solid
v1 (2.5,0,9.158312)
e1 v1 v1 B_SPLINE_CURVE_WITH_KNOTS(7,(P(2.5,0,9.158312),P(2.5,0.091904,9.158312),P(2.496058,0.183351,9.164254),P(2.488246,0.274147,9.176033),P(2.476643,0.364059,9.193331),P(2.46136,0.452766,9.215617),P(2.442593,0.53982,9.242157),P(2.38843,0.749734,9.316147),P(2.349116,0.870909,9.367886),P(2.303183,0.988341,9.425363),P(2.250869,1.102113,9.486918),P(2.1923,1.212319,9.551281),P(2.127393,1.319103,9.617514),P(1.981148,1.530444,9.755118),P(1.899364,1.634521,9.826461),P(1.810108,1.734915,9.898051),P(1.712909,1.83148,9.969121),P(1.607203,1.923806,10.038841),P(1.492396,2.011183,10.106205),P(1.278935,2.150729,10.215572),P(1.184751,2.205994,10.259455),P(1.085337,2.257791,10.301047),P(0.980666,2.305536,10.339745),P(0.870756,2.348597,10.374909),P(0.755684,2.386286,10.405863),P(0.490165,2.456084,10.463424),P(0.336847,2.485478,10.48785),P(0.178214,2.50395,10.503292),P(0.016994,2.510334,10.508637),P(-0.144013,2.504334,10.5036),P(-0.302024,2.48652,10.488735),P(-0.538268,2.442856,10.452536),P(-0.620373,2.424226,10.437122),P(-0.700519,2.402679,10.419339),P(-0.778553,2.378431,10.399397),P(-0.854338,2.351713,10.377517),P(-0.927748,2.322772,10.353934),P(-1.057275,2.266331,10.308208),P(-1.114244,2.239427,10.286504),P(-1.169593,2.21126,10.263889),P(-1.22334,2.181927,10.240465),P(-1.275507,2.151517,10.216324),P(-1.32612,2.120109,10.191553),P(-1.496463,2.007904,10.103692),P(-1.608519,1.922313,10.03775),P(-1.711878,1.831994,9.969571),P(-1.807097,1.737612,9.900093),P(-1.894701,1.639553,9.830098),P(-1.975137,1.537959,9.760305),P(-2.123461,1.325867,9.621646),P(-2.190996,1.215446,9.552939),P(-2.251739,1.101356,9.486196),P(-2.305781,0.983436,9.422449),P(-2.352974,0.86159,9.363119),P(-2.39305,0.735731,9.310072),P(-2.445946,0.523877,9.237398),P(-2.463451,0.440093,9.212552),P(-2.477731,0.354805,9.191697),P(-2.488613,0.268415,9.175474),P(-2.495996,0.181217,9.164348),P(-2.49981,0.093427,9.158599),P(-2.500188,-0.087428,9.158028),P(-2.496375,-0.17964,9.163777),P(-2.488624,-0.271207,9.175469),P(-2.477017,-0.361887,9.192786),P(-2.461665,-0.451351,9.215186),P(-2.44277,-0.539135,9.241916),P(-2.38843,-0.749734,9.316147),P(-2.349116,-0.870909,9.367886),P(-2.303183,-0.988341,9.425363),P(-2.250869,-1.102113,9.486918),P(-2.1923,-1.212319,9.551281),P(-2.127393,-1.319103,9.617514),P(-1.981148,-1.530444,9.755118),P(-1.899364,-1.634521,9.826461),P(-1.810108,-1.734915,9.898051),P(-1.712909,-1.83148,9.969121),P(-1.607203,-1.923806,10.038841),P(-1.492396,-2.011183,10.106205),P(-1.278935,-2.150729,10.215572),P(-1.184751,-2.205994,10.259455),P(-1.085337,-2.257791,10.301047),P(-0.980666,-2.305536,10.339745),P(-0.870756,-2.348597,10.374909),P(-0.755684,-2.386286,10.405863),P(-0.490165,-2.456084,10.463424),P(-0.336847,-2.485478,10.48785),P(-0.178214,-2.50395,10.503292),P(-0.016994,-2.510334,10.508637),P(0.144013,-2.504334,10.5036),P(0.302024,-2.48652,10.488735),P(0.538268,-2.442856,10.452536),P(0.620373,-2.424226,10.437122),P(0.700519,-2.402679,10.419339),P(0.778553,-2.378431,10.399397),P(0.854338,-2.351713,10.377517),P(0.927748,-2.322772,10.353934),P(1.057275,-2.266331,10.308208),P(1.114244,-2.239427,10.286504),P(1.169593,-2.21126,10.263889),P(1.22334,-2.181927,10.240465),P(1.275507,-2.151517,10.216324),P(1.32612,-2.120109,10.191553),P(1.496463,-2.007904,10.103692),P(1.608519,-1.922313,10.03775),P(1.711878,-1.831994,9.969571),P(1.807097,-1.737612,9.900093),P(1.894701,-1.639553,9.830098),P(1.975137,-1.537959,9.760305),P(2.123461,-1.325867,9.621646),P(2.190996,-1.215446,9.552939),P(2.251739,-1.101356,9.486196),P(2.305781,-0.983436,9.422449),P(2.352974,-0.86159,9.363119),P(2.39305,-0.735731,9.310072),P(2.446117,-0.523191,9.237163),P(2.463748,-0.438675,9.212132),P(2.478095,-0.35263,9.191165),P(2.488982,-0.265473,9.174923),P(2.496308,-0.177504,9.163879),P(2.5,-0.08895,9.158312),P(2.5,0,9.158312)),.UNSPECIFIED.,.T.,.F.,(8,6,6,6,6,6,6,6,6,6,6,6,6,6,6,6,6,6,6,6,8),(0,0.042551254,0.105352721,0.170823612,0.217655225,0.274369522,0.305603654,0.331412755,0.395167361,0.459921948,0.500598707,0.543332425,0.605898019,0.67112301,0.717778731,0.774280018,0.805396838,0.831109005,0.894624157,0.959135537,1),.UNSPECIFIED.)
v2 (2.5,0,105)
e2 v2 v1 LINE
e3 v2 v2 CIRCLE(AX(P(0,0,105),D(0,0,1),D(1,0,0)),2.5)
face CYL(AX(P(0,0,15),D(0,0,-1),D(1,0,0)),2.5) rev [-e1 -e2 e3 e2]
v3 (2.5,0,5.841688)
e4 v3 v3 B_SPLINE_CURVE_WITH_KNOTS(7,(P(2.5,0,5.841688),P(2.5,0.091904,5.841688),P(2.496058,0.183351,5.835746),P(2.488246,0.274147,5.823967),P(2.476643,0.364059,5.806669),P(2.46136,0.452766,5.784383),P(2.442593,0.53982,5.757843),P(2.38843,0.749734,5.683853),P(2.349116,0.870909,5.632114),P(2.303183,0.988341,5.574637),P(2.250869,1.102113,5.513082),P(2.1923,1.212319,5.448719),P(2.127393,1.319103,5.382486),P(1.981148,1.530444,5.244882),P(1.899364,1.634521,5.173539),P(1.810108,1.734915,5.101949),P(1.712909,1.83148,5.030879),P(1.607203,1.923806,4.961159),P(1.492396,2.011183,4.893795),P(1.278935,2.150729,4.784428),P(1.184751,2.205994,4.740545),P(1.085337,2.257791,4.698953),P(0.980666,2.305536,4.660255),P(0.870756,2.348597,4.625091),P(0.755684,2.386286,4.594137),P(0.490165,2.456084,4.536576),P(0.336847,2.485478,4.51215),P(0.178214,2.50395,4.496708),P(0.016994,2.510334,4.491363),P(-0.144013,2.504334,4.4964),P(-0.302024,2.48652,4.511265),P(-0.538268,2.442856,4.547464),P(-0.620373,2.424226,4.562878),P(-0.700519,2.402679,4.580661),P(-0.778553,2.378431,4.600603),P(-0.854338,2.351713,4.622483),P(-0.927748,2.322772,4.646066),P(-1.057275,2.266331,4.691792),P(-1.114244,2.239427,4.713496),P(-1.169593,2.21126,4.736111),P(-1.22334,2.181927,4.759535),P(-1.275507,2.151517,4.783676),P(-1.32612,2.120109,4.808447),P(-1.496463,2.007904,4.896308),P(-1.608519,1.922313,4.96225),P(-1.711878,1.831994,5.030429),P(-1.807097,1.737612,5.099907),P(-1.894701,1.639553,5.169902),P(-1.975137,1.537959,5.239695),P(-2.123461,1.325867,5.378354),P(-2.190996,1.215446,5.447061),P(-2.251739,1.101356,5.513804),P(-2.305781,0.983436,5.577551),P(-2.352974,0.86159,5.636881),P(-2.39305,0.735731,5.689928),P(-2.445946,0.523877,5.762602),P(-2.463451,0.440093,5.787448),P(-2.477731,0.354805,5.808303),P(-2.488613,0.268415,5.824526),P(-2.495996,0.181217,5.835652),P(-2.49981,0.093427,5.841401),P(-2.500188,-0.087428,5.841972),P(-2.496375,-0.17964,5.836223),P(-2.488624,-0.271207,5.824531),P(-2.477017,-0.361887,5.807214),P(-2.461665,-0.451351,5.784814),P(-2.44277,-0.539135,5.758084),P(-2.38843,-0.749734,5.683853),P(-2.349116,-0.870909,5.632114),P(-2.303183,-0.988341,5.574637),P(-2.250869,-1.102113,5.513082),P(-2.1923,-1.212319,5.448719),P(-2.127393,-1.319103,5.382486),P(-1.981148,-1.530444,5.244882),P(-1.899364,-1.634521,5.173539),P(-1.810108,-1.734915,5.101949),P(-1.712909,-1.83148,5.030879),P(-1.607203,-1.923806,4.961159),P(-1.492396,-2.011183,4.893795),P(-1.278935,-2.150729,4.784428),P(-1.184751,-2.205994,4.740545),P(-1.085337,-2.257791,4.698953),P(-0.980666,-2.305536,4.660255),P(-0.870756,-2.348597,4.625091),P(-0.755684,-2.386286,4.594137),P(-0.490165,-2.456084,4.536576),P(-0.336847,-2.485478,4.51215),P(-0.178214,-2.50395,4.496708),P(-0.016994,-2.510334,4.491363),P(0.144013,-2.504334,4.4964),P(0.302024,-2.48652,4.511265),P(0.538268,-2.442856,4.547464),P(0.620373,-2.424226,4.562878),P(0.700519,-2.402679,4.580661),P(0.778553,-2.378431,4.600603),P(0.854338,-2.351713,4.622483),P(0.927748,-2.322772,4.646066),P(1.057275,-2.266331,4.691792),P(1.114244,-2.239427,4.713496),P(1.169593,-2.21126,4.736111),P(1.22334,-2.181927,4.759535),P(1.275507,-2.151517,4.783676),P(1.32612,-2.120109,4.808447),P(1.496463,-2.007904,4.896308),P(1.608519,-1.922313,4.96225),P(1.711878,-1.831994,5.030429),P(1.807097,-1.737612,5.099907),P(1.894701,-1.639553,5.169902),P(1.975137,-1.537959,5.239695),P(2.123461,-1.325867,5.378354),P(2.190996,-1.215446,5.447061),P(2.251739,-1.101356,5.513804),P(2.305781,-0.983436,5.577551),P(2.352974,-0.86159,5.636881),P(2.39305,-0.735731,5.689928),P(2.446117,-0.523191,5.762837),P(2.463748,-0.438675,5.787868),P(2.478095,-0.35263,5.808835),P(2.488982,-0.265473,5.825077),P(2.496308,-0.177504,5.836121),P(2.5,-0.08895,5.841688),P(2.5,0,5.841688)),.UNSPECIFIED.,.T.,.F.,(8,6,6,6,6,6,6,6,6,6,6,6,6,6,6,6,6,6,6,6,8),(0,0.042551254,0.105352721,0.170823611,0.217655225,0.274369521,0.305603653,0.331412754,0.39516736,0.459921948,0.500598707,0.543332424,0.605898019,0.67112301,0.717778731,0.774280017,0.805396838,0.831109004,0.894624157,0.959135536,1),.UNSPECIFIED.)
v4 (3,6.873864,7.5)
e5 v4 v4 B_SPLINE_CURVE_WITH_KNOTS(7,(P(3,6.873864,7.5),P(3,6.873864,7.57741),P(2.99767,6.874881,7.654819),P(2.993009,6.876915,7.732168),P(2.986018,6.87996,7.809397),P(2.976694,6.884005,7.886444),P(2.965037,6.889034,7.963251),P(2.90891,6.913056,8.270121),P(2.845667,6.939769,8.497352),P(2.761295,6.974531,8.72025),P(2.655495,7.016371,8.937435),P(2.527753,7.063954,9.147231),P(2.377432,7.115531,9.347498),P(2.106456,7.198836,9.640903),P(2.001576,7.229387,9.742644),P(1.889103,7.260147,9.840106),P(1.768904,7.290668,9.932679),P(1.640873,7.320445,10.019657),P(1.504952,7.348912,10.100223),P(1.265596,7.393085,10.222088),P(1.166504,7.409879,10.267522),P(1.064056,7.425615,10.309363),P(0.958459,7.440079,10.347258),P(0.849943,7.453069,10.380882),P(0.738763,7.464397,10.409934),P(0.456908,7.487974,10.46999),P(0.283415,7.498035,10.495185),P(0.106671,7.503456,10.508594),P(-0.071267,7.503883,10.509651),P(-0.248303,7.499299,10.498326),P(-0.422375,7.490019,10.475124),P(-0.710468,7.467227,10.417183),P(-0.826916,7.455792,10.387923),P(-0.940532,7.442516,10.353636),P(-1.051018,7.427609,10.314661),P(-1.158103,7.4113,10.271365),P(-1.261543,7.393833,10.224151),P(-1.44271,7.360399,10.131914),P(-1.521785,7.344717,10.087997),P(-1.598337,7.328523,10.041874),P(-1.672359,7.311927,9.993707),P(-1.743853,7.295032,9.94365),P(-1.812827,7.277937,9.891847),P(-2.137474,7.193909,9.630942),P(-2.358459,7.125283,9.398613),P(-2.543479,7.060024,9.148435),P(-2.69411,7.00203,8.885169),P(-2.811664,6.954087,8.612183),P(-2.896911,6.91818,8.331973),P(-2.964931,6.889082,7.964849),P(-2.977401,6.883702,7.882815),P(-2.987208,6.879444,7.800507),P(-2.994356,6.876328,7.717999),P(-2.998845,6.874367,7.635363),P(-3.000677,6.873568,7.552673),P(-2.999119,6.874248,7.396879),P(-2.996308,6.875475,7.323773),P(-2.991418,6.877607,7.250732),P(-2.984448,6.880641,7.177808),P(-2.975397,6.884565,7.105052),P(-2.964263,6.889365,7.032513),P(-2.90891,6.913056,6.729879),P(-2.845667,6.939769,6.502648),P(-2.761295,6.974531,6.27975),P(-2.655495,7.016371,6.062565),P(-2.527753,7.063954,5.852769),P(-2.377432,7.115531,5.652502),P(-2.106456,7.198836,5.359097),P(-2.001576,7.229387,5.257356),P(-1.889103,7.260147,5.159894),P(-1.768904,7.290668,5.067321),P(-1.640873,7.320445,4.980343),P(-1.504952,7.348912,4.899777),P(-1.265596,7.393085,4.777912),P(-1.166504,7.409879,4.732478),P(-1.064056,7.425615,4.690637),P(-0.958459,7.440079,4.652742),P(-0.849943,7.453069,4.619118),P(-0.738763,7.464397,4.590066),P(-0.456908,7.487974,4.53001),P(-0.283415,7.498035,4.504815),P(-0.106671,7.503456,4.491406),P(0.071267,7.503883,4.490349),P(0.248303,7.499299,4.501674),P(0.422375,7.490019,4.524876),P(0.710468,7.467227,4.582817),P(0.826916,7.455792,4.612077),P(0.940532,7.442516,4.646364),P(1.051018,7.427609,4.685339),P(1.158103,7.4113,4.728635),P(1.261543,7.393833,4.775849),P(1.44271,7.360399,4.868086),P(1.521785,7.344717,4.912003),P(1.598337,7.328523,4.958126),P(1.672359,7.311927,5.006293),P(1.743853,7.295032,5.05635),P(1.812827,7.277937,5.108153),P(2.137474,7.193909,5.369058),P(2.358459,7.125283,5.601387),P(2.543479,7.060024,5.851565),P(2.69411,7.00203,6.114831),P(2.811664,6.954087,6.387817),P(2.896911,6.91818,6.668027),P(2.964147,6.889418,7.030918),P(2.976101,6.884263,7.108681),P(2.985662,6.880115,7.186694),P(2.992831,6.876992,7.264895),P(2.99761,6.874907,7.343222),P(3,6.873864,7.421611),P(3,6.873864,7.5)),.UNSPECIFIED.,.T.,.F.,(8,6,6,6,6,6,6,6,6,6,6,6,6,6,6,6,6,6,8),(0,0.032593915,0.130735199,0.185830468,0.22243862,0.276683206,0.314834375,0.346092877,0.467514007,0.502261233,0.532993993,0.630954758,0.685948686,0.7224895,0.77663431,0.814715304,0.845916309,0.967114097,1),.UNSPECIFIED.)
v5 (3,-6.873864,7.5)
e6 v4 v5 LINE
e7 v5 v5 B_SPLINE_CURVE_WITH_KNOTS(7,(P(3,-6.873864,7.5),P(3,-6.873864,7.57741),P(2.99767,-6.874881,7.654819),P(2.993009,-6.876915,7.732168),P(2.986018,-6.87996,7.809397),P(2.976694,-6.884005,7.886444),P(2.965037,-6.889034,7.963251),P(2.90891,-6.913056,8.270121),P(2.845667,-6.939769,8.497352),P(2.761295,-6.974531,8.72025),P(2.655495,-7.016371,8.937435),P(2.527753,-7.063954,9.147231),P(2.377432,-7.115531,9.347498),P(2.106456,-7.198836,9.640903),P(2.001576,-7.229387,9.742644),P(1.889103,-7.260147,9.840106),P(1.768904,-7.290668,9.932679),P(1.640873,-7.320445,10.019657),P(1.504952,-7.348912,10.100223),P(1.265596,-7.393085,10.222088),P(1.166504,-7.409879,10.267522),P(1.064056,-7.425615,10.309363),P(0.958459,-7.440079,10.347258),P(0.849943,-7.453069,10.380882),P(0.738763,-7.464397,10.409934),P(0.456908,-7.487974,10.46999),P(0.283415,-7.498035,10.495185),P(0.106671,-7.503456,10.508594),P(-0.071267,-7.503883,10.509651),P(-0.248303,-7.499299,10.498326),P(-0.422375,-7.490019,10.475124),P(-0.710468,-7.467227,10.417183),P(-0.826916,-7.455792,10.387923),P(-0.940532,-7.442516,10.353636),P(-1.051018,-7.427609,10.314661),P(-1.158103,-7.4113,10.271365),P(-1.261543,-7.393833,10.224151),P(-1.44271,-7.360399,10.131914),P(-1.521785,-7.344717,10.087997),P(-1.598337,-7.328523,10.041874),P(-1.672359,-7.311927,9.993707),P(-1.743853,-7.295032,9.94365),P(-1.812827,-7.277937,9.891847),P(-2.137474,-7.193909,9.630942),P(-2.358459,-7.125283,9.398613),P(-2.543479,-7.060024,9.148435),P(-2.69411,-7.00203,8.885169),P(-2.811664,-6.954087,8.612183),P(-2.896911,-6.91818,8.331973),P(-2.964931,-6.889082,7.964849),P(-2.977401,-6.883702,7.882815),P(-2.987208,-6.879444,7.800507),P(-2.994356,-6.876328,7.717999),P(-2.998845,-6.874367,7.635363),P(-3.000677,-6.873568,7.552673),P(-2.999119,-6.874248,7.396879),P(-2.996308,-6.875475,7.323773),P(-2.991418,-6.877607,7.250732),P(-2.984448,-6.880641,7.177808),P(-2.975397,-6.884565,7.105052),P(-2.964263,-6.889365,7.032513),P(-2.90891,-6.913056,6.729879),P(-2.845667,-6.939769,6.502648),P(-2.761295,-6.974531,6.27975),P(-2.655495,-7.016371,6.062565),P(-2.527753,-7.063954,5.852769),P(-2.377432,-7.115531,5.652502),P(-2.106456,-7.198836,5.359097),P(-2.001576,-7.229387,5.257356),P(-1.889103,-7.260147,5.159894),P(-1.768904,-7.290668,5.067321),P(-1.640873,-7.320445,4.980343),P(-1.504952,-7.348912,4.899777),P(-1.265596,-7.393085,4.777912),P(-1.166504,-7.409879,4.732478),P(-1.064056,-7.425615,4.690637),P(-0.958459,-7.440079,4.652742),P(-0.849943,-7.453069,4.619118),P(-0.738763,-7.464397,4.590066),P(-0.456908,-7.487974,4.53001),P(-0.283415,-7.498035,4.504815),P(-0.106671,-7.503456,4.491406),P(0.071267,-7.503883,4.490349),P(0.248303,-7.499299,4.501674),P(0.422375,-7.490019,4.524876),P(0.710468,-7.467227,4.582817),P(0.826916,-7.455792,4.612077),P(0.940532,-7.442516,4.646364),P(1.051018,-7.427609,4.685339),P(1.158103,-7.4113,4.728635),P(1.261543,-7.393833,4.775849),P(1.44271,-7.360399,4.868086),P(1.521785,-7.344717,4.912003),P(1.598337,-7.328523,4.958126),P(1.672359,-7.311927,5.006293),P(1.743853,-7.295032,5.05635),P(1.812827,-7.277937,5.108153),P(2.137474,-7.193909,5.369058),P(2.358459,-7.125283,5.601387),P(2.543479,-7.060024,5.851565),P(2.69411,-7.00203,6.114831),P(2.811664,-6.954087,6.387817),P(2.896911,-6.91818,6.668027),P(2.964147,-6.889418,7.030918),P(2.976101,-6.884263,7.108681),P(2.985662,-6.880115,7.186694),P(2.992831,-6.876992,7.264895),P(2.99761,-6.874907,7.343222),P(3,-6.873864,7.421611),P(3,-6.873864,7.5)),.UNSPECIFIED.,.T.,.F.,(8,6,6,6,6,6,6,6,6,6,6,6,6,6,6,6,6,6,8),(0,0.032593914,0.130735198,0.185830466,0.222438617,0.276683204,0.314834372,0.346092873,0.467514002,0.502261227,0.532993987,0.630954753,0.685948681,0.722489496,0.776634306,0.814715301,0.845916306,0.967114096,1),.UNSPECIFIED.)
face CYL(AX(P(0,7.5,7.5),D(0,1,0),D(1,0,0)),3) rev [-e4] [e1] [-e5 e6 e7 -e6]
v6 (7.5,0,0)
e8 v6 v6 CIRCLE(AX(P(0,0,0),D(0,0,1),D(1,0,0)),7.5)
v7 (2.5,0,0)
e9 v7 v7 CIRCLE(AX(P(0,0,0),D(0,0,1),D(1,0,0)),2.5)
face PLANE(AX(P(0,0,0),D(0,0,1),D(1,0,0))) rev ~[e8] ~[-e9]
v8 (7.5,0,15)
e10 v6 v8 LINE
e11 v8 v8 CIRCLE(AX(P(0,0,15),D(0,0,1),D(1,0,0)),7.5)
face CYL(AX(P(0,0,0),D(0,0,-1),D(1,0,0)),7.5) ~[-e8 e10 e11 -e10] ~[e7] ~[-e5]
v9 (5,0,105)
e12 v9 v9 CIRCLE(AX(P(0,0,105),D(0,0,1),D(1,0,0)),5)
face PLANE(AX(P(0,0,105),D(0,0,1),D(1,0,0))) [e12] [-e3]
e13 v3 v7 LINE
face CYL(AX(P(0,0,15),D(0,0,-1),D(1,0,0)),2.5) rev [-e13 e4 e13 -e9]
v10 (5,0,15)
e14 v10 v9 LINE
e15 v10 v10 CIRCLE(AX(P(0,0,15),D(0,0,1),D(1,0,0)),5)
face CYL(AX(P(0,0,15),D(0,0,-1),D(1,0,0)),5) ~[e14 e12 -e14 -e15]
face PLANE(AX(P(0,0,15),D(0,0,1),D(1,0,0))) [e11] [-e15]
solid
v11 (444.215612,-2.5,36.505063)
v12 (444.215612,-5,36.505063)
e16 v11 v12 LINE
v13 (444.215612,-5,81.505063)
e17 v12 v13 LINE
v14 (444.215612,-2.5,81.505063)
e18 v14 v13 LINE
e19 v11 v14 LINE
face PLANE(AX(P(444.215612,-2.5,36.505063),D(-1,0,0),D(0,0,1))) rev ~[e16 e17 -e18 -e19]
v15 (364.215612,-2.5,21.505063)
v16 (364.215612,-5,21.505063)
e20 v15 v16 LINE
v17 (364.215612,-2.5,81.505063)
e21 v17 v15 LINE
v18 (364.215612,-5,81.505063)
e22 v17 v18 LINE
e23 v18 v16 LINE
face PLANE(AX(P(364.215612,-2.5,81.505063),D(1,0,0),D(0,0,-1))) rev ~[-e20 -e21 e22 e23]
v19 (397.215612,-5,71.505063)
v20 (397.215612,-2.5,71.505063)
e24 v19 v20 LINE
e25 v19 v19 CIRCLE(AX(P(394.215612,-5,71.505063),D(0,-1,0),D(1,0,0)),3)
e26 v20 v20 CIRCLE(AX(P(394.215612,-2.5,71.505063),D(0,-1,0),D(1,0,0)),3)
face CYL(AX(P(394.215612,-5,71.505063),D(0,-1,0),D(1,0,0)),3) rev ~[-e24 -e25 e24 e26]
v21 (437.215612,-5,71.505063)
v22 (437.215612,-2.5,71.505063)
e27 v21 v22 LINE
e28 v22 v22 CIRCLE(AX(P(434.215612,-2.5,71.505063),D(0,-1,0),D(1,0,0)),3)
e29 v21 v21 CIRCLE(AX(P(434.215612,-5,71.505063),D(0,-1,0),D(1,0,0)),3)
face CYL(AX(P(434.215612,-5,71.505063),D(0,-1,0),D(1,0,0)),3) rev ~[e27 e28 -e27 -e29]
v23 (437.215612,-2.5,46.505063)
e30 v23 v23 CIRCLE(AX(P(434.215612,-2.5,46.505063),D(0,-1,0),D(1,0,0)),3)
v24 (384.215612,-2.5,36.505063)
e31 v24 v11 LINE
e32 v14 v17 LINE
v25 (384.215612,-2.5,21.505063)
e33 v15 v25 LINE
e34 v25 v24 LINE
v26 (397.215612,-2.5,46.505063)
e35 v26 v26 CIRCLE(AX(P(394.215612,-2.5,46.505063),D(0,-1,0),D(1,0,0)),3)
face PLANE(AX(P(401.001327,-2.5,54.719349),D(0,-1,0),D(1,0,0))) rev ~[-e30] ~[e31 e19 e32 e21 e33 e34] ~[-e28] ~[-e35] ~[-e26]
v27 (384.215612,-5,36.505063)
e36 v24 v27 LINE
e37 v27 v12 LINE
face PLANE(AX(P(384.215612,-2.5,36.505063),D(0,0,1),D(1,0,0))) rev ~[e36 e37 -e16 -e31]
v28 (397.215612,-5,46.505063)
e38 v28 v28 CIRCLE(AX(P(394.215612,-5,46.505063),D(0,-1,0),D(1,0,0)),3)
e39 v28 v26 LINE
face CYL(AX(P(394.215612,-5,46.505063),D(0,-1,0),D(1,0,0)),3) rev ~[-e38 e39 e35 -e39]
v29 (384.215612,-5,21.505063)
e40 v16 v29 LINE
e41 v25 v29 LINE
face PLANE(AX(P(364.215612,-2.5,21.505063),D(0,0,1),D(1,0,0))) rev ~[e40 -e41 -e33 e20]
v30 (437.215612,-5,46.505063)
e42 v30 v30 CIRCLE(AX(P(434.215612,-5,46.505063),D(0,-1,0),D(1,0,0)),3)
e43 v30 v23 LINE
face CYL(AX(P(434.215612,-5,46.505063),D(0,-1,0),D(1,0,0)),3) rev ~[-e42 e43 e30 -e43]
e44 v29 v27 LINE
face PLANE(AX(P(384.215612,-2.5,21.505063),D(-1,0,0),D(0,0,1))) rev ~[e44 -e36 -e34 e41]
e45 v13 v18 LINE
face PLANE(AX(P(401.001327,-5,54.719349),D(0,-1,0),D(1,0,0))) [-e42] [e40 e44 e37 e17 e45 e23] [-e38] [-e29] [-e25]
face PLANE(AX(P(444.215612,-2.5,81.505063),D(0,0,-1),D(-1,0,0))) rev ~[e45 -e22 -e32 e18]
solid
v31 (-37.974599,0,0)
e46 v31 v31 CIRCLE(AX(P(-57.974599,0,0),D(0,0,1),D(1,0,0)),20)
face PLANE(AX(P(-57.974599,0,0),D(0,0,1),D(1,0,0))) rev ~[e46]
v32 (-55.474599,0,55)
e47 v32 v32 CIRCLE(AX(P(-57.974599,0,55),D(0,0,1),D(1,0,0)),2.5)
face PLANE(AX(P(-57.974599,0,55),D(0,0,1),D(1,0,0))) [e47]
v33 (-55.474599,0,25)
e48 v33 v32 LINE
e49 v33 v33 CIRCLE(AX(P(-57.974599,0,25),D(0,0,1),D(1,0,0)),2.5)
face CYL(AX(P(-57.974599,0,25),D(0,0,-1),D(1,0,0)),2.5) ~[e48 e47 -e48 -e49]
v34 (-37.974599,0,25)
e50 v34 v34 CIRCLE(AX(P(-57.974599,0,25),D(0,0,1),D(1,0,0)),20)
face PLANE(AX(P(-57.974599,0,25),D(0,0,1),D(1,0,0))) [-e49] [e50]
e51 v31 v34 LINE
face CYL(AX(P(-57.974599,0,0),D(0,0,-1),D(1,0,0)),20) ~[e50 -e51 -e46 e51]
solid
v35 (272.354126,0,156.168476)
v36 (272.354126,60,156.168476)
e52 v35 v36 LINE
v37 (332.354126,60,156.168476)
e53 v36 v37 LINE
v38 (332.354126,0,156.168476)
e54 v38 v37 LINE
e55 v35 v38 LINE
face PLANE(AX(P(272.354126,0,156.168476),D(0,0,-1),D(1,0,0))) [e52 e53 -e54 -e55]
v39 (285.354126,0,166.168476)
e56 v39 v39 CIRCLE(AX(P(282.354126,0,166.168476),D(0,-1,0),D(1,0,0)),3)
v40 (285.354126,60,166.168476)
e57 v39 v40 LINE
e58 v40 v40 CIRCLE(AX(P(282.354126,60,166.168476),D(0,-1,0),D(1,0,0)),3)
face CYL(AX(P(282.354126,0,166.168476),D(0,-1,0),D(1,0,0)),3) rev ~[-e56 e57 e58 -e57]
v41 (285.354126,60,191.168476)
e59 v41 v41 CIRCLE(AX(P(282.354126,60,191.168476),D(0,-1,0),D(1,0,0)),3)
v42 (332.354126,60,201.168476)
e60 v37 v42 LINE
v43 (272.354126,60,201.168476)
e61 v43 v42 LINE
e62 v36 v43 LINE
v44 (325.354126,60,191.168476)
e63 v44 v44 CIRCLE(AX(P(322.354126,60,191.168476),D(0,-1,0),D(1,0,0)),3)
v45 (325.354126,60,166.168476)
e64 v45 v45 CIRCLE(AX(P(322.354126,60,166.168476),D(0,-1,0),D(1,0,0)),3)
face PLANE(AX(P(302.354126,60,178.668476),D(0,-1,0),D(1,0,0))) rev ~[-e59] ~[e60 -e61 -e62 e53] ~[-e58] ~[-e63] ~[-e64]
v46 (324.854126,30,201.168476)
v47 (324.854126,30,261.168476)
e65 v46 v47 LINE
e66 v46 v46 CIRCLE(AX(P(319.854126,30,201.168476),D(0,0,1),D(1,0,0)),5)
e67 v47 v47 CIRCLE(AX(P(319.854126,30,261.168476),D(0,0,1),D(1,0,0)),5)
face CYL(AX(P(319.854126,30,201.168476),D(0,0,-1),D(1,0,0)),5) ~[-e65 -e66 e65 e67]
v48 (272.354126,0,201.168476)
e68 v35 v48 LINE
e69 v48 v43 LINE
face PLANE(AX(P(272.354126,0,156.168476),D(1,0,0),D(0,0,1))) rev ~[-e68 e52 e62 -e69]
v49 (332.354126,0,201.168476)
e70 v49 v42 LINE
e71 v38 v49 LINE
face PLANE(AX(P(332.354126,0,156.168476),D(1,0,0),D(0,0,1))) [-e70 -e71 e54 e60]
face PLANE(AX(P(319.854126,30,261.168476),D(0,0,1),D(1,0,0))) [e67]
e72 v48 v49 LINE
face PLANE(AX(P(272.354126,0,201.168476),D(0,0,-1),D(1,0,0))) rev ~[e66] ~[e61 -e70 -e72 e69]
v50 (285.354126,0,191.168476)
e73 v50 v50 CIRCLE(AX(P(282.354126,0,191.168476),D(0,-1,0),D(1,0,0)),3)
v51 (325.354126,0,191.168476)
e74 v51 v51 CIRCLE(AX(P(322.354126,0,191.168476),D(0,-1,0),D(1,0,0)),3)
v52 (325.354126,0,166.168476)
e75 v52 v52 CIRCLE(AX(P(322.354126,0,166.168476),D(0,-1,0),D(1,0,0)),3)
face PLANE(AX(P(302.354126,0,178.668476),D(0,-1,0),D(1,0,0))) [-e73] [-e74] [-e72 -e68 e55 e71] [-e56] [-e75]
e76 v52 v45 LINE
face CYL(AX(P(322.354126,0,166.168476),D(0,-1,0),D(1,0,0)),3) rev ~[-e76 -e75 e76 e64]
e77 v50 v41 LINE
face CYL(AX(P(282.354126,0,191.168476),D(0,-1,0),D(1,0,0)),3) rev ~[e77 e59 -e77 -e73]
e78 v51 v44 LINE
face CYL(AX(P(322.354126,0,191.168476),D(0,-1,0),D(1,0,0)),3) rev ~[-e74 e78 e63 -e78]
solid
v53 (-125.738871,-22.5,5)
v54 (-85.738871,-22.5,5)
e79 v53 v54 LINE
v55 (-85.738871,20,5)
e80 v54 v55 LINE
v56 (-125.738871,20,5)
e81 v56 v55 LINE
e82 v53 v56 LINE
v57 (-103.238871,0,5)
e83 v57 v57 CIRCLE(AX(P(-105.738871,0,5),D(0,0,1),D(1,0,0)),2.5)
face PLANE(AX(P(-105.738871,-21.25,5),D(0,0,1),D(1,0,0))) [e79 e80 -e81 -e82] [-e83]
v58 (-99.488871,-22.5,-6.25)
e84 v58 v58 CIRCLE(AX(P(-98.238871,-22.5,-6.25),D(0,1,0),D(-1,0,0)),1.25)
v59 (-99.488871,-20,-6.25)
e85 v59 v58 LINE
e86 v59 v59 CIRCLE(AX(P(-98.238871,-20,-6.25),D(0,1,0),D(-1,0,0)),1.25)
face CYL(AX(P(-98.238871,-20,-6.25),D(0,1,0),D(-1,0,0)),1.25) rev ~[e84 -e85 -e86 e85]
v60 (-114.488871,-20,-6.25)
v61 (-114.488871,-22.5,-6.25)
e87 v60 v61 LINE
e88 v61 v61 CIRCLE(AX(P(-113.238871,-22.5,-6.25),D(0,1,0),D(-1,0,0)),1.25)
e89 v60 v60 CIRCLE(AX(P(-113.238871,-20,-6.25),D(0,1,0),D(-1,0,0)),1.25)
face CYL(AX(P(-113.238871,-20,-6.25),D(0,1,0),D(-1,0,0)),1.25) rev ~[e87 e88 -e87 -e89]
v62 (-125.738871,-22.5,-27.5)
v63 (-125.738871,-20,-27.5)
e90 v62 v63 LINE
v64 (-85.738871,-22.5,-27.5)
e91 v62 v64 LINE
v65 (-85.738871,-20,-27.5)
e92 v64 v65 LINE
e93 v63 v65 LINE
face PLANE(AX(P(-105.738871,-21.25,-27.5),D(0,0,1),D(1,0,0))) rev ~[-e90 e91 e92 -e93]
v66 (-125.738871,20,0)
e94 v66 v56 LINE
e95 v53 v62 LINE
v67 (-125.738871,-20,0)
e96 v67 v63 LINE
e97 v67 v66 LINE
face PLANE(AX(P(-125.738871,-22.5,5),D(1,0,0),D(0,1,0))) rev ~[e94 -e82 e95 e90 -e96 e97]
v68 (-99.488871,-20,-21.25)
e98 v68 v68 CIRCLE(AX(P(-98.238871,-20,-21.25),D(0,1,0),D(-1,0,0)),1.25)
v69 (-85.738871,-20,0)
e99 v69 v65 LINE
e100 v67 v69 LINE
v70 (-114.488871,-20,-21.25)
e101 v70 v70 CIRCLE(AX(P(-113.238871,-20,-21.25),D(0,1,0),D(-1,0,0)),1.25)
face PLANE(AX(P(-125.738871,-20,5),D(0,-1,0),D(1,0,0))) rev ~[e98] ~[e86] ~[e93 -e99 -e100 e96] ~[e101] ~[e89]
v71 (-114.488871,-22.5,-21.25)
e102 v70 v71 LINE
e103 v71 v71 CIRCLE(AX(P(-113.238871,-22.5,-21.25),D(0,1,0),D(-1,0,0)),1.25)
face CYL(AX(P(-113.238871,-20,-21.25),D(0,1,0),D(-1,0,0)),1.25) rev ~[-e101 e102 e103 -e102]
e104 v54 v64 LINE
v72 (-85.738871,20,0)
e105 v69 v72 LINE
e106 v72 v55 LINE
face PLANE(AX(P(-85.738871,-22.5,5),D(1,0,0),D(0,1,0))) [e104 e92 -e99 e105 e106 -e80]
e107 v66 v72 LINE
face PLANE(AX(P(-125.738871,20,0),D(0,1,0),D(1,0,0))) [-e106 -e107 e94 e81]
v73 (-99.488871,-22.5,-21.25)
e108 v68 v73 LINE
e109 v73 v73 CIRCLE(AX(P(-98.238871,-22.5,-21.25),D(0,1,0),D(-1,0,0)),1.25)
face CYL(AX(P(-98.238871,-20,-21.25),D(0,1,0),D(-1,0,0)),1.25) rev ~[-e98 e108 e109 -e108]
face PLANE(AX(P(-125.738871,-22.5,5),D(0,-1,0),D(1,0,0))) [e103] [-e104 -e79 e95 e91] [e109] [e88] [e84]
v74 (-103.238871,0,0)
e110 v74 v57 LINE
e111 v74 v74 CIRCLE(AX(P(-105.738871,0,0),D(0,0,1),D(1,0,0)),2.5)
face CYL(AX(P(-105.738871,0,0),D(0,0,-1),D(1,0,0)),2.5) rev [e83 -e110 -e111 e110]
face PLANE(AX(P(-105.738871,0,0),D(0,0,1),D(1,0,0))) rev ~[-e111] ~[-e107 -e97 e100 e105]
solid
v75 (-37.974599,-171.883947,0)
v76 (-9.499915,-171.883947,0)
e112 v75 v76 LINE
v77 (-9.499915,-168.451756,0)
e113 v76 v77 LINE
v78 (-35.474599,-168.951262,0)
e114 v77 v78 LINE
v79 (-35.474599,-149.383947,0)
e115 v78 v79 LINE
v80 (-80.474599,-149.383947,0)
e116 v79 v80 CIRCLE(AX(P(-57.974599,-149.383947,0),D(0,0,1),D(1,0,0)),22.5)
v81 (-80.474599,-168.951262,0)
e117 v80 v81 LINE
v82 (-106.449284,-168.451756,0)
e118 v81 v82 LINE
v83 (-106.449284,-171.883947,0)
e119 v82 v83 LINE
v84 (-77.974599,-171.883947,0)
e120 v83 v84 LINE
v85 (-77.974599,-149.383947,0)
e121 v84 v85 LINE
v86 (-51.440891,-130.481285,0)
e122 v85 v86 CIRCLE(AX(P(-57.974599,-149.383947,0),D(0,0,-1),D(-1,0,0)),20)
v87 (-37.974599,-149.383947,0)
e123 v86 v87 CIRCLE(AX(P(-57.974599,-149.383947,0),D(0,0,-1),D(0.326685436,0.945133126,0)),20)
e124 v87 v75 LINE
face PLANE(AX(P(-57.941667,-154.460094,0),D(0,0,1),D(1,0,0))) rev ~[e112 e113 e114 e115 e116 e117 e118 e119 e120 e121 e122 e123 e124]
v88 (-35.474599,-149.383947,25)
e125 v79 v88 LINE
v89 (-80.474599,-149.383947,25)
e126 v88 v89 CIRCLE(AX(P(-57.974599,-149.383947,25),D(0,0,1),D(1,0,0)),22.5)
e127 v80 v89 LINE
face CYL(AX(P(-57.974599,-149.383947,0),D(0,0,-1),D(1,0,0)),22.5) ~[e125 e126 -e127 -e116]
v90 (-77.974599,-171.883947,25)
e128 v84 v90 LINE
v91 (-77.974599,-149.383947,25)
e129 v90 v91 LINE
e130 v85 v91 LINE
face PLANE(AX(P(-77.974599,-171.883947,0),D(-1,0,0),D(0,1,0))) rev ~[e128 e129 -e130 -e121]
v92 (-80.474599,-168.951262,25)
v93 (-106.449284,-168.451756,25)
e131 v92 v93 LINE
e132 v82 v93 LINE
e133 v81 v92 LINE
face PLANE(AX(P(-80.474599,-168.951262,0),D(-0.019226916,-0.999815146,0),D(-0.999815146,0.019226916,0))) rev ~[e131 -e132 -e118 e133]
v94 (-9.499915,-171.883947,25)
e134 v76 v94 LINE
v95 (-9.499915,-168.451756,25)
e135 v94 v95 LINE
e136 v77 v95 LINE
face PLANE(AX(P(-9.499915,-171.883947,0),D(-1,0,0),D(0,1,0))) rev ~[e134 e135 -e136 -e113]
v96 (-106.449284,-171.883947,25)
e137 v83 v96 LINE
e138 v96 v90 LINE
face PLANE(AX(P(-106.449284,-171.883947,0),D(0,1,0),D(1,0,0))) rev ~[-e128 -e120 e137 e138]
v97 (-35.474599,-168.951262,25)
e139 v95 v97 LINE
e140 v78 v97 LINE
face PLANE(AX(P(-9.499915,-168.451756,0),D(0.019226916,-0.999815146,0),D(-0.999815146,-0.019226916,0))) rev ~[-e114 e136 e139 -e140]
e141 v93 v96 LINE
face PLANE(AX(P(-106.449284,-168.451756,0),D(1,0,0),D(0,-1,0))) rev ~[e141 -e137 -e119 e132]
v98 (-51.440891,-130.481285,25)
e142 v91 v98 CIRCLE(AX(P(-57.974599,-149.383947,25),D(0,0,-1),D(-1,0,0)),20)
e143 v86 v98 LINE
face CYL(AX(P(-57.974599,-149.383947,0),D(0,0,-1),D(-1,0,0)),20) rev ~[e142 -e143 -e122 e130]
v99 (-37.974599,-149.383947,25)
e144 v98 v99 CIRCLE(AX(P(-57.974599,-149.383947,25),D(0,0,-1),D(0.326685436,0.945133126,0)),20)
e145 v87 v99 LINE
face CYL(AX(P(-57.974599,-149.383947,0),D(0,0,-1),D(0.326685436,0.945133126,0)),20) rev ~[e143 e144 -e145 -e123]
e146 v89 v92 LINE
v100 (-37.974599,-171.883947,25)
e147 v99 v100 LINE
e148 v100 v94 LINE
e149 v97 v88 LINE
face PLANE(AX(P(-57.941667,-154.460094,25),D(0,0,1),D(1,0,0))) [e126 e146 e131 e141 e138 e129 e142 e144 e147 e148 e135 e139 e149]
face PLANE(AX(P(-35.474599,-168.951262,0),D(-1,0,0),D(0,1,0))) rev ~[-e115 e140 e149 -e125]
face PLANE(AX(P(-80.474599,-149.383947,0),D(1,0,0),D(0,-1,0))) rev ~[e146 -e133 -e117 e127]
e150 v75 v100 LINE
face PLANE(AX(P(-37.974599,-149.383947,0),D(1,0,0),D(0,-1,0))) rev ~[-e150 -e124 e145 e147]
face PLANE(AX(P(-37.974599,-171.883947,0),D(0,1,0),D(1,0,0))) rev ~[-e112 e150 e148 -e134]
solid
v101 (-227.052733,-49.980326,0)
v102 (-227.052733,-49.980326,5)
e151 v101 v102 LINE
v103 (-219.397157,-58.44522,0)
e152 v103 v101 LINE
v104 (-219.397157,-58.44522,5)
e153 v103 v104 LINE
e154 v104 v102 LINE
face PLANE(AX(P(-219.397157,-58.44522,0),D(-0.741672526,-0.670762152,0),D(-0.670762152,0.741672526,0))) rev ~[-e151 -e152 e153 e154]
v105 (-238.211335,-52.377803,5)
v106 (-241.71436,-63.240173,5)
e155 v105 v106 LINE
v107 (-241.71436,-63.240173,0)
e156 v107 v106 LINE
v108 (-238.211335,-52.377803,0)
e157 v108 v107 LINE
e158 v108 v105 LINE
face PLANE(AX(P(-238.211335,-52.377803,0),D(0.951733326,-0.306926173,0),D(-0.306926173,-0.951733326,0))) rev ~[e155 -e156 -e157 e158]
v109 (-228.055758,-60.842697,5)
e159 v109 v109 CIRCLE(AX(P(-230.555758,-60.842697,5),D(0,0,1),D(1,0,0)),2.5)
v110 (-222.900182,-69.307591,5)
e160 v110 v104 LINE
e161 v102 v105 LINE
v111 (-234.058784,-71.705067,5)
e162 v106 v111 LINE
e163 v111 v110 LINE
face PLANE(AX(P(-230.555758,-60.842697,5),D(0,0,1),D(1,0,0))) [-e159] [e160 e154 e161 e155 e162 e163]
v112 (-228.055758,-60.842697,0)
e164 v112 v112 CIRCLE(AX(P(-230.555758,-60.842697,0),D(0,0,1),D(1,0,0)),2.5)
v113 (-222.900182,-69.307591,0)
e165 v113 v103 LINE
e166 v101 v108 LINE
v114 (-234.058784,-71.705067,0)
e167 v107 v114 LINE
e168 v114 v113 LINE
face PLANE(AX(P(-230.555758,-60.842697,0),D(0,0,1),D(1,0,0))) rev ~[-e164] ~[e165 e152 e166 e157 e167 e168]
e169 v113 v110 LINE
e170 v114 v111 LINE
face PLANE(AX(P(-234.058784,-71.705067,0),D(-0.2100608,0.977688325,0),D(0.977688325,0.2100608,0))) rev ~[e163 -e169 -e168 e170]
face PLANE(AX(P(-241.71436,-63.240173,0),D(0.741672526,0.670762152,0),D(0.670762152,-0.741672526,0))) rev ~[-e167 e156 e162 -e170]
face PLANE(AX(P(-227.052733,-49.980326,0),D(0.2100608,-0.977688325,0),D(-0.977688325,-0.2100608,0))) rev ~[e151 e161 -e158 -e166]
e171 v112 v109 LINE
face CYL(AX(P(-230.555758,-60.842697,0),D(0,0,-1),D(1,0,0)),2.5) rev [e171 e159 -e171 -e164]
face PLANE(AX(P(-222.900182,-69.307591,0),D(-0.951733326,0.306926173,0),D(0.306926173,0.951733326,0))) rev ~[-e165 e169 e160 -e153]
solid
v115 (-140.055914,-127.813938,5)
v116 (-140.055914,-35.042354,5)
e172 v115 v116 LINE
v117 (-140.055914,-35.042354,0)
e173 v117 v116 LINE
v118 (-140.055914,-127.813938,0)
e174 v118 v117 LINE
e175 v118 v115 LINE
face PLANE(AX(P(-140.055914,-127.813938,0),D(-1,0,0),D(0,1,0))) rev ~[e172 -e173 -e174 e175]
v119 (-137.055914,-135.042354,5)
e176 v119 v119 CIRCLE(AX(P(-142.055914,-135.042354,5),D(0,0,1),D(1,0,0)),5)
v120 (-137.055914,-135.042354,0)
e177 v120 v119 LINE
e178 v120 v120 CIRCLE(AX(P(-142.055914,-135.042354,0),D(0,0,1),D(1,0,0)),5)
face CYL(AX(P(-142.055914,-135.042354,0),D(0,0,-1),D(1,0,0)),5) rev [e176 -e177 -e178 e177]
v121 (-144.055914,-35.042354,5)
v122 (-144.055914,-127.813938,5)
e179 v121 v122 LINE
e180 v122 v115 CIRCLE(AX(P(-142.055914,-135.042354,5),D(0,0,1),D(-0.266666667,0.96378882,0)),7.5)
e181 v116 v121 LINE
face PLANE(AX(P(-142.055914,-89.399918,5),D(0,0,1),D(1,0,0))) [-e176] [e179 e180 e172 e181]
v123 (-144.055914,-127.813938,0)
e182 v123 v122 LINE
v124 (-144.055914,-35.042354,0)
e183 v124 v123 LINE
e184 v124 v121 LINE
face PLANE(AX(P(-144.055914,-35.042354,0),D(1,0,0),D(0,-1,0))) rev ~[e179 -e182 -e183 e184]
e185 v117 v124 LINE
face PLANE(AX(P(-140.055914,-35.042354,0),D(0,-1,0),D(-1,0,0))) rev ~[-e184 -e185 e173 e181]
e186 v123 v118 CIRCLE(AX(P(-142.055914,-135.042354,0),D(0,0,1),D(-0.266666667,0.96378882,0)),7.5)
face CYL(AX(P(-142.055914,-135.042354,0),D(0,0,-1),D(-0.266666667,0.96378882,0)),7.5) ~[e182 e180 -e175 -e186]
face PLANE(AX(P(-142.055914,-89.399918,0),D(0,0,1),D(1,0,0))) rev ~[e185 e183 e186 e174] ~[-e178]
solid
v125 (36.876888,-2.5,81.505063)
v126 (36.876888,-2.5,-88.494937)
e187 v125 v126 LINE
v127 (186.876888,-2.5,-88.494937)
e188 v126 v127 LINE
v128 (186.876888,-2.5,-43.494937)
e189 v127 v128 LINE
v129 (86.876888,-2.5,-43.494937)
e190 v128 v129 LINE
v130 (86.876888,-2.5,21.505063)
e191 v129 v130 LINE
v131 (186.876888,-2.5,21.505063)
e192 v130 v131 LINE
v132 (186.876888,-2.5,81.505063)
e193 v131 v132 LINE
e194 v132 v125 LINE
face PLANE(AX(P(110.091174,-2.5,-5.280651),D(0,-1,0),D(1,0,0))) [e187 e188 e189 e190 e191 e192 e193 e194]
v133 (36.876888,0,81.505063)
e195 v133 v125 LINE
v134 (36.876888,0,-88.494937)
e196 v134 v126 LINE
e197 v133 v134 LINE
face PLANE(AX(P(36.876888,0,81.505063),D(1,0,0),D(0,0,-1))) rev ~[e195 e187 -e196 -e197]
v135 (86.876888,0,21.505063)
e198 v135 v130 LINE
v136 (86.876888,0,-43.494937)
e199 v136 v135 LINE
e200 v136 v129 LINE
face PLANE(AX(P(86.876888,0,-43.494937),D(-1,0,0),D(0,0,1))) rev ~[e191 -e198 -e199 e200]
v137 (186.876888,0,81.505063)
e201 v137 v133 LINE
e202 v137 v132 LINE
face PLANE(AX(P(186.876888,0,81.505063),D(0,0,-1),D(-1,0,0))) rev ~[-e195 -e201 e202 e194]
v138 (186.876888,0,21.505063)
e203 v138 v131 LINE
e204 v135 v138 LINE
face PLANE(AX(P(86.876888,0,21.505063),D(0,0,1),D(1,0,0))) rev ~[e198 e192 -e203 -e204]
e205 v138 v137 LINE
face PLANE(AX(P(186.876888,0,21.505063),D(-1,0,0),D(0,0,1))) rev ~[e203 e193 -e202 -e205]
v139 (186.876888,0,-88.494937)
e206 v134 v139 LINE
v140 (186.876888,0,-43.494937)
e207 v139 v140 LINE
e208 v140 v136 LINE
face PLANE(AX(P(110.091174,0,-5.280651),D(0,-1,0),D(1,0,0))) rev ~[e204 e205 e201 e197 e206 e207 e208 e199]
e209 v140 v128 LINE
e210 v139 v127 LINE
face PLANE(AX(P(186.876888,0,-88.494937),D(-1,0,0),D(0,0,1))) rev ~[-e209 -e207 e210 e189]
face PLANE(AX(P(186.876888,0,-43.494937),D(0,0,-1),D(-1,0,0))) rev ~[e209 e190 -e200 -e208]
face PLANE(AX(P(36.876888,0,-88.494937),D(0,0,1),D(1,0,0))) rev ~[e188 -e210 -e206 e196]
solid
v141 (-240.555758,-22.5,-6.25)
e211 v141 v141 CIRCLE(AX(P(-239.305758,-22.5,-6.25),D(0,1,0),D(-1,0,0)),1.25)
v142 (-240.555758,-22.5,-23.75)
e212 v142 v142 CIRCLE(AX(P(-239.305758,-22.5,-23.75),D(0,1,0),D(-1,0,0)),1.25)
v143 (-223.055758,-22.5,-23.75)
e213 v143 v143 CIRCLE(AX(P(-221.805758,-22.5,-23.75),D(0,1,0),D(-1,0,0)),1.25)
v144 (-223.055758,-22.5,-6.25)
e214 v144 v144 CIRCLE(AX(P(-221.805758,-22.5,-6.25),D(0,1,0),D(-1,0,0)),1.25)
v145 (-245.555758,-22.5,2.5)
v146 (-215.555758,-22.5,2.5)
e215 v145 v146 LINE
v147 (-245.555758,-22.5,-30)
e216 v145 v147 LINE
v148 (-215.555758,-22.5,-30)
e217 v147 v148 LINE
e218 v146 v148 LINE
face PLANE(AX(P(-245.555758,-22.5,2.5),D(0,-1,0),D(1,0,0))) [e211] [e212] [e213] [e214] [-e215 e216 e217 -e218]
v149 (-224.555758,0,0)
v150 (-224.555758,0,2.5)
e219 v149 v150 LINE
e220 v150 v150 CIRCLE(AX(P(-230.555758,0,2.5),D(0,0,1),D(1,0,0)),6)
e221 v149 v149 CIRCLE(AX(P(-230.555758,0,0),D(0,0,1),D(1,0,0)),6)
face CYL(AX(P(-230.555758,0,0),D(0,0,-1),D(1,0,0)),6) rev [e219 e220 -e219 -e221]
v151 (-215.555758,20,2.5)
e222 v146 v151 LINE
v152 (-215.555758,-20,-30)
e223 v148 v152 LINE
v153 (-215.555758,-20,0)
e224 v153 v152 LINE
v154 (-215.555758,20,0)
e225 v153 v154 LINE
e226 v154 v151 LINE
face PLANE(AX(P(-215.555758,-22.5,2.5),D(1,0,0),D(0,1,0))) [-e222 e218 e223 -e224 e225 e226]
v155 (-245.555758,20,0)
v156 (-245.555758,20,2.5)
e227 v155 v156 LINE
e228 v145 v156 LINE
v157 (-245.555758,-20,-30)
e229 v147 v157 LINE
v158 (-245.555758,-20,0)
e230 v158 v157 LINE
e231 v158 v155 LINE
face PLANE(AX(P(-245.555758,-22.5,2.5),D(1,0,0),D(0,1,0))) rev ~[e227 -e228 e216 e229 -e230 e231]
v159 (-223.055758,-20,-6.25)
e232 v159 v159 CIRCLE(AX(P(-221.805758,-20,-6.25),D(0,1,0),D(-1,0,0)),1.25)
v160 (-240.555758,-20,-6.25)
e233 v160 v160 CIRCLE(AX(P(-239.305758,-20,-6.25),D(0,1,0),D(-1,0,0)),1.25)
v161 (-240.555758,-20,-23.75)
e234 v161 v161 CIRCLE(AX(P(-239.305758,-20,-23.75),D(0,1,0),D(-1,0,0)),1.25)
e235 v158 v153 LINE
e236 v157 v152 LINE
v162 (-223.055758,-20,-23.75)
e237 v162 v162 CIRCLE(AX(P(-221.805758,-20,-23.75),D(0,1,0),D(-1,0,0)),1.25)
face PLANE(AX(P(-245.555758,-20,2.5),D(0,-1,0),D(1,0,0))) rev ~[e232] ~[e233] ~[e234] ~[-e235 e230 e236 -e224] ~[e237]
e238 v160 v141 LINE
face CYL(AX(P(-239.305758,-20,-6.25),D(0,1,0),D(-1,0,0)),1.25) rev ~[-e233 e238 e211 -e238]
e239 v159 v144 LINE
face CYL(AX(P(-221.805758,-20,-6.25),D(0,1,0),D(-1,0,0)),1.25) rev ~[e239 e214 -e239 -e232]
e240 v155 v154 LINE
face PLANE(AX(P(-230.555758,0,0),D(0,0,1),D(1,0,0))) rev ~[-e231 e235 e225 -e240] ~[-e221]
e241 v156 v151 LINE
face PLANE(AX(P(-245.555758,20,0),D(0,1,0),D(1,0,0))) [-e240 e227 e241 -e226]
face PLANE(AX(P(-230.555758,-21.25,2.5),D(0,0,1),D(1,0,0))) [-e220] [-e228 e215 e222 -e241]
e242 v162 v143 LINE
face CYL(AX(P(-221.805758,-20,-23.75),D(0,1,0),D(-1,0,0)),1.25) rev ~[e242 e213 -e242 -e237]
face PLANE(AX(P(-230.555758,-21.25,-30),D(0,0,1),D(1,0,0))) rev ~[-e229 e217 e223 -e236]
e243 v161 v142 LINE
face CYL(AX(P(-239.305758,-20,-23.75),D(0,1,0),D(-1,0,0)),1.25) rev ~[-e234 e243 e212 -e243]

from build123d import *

# Parameters (mm, degrees)
F0_R      = 2.5
F1_DEPTH  = 15
F2_R      = 5
F2_R_2    = 2.5
F3_DEPTH  = 90
F5_R      = 3
F6_DEPTH  = 15.001
F0_R_2    = 20
F7_DEPTH  = 25
F8_R      = 2.5
F9_DEPTH  = 30
F0_W      = 40
F0_H      = 40
F10_DEPTH = 5
F11_W     = 40
F11_H     = 2.5
F12_DEPTH = 32.5
F14_DEPTH = 2.5
F0_W_2    = 30
F0_R_3    = 6
F16_DEPTH = 2.5
F17_W     = 30
F17_H     = 2.5
F18_DEPTH = 32.5
F19_DEPTH = 5
F20_R     = 1.25
F21_DEPTH = 2.5
F22_R     = 1.25
F23_DEPTH = 2.5
F13_W     = 60
F13_H     = 45
F13_R     = 3
F24_DEPTH = 60
F25_R     = 5
F26_DEPTH = 60
F27_DEPTH = 2.5
F28_R     = 3
F29_DEPTH = 25
F0_R_4    = 5
F30_DEPTH = 5
F31_DEPTH = 25


with BuildPart() as f1:
    # F0 (on Top) → F1 (new body)
    with BuildSketch(Plane.XY):
        with BuildLine():
            ThreePointArc((0, 7.5), (-5.3033008589, -5.3033008589), (7.5, 0))
            ThreePointArc((7.5, 0), (5.3033008589, 5.3033008589), (0, 7.5))
        make_face()
        Circle(F0_R, mode=Mode.SUBTRACT)
    extrude(amount=F1_DEPTH)

    # F2 (on face) → F3 (join)
    with BuildSketch(Plane.XY.offset(15)):
        Circle(F2_R)
        Circle(F2_R_2, mode=Mode.SUBTRACT)
    extrude(amount=F3_DEPTH)

    # F5 (on face) → F6 (cut, through all)
    with BuildSketch(Plane.XZ.offset(-7.5)):
        with Locations((0, 7.5)):
            Circle(F5_R)
    extrude(amount=F6_DEPTH, mode=Mode.SUBTRACT)


with BuildPart() as f7:
    # F0 (on Top) → F7 (new body)
    with BuildSketch(Plane.XY):
        with Locations((-57.9745993018, 0)):
            Circle(F0_R_2)
    extrude(amount=F7_DEPTH)

    # F8 (on face) → F9 (join)
    with BuildSketch(Plane.XY.offset(25)):
        with Locations((-57.9745993018, 0)):
            Circle(F8_R)
    extrude(amount=F9_DEPTH)


with BuildPart() as f10:
    # F0 (on Top) → F10 (new body)
    with BuildSketch(Plane.XY):
        with Locations((-105.7388707995, 0)):
            Rectangle(F0_W, F0_H)
        with Locations((-105.7388707995, 0)):
            Circle(F0_R, mode=Mode.SUBTRACT)
    extrude(amount=F10_DEPTH)

    # F11 (on face) → F12 (join)
    with BuildSketch(Plane.XY.offset(5)):
        with Locations((-105.7388707995, -21.25)):
            Rectangle(F11_W, F11_H)
    extrude(amount=-F12_DEPTH)

    # F20 (on face) → F21 (cut, through all)
    with BuildSketch(Plane(origin=(0, -20, 0), x_dir=(-1, 0, 0), z_dir=(0, 1, 0))):
        with Locations((98.2388707995, -6.25)):
            Circle(F20_R)
        with Locations((113.2388707995, -6.25)):
            Circle(F20_R)
        with Locations((113.2388707995, -21.25)):
            Circle(F20_R)
        with Locations((98.2388707995, -21.25)):
            Circle(F20_R)
    extrude(amount=-F21_DEPTH, mode=Mode.SUBTRACT)


with BuildPart() as f14:
    # F13 (on Front) → F14 (new body)
    with BuildSketch(Plane.XZ):
        Polygon((186.8768878281, 81.5050628316), (36.8768878281, 81.5050628316), (36.8768878281, -88.4949371684), (186.8768878281, -88.4949371684), (186.8768878281, -43.4949371684), (86.8768878281, -43.4949371684), (86.8768878281, 21.5050628316), (186.8768878281, 21.5050628316), align=None)
    extrude(amount=F14_DEPTH)


with BuildPart() as f16:
    # F0 (on Top) → F16 (new body)
    with BuildSketch(Plane.XY):
        with Locations((-230.5557584763, 0)):
            Rectangle(F0_W_2, F0_H)
        with Locations((-230.5557584763, 0)):
            Circle(F0_R_3, mode=Mode.SUBTRACT)
    extrude(amount=F16_DEPTH)

    # F17 (on face) → F18 (join)
    with BuildSketch(Plane.XY.offset(2.5)):
        with Locations((-230.5557584763, -21.25)):
            Rectangle(F17_W, F17_H)
    extrude(amount=-F18_DEPTH)

    # F22 (on face) → F23 (cut, through all)
    with BuildSketch(Plane(origin=(0, -20, 0), x_dir=(-1, 0, 0), z_dir=(0, 1, 0))):
        with Locations((221.8057584763, -6.25)):
            Circle(F22_R)
        with Locations((221.8057584763, -23.75)):
            Circle(F22_R)
        with Locations((239.3057584763, -23.75)):
            Circle(F22_R)
        with Locations((239.3057584763, -6.25)):
            Circle(F22_R)
    extrude(amount=-F23_DEPTH, mode=Mode.SUBTRACT)


with BuildPart() as f19:
    # F0 (on Top) → F19 (new body)
    with BuildSketch(Plane.XY):
        Polygon((-222.9001823011, -69.3075905842), (-219.3971571383, -58.4452201324), (-227.0527333135, -49.9803261255), (-238.2113346515, -52.3778025704), (-241.7143598142, -63.2401730222), (-234.058783639, -71.7050670291), align=None)
        with Locations((-230.5557584763, -60.8426965773)):
            Circle(F0_R, mode=Mode.SUBTRACT)
    extrude(amount=F19_DEPTH)


with BuildPart() as f24:
    # F13 (on Front) → F24 (new body)
    with BuildSketch(Plane.XZ):
        with Locations((302.3541259766, 178.6684757471)):
            Rectangle(F13_W, F13_H)
        with Locations((282.3541259766, 166.1684757471)):
            Circle(F13_R, mode=Mode.SUBTRACT)
        with Locations((282.3541259766, 191.1684757471)):
            Circle(F13_R, mode=Mode.SUBTRACT)
        with Locations((322.3541259766, 166.1684757471)):
            Circle(F13_R, mode=Mode.SUBTRACT)
        with Locations((322.3541259766, 191.1684757471)):
            Circle(F13_R, mode=Mode.SUBTRACT)
    extrude(amount=-F24_DEPTH)

    # F25 (on face) → F26 (join)
    with BuildSketch(Plane.XY.offset(201.1684757471)):
        with Locations((319.8541259766, 30)):
            Circle(F25_R)
    extrude(amount=F26_DEPTH)


with BuildPart() as f27:
    # F15 (on face) → F27 (new body)
    with BuildSketch(Plane.XZ.offset(2.5)):
        Polygon((444.2156124115, 81.5050628316), (364.2156124115, 81.5050628316), (364.2156124115, 21.5050628316), (384.2156124115, 21.5050628316), (384.2156124115, 36.5050628316), (444.2156124115, 36.5050628316), align=None)
    extrude(amount=F27_DEPTH)

    # F28 (on face) → F29 (cut)
    with BuildSketch(Plane.XZ.offset(5)):
        with Locations((394.2156124115, 71.5050628316)):
            Circle(F28_R)
        with Locations((394.2156124115, 46.5050628316)):
            Circle(F28_R)
        with Locations((434.2156124115, 71.5050628316)):
            Circle(F28_R)
        with Locations((434.2156124115, 46.5050628316)):
            Circle(F28_R)
    extrude(amount=-F29_DEPTH, mode=Mode.SUBTRACT)


with BuildPart() as f30:
    # F0 (on Top) → F30 (new body)
    with BuildSketch(Plane.XY):
        with BuildLine():
            Line((-144.055913806, -35.0423544645), (-144.055913806, -127.8139383171))
            ThreePointArc((-144.055913806, -127.8139383171), (-142.055913806, -142.5423544645), (-140.055913806, -127.8139383171))
            Line((-140.055913806, -127.8139383171), (-140.055913806, -35.0423544645))
            Line((-140.055913806, -35.0423544645), (-142.055913806, -35.0423544645))
            Line((-142.055913806, -35.0423544645), (-144.055913806, -35.0423544645))
        make_face()
        with Locations((-142.055913806, -135.0423544645)):
            Circle(F0_R_4, mode=Mode.SUBTRACT)
    extrude(amount=F30_DEPTH)


with BuildPart() as f31:
    # F0 (on Top) → F31 (new body)
    with BuildSketch(Plane.XY):
        with BuildLine():
            Line((-35.4745993018, -168.9512616546), (-35.4745993018, -149.3839472532))
            ThreePointArc((-35.4745993018, -149.3839472532), (-57.9745993018, -126.8839472532), (-80.4745993018, -149.3839472532))
            Line((-80.4745993018, -149.3839472532), (-80.4745993018, -168.9512616546))
            Line((-80.4745993018, -168.9512616546), (-106.4492836595, -168.4517562389))
            Line((-106.4492836595, -168.4517562389), (-106.4492836595, -171.8839472532))
            Line((-106.4492836595, -171.8839472532), (-80.4745993018, -171.8839472532))
            Line((-80.4745993018, -171.8839472532), (-77.9745993018, -171.8839472532))
            Line((-77.9745993018, -171.8839472532), (-77.9745993018, -149.3839472532))
            ThreePointArc((-77.9745993018, -149.3839472532), (-69.5790343502, -133.0947763963), (-51.4408905811, -130.481284733))
            ThreePointArc((-51.4408905811, -130.481284733), (-41.6854284449, -137.7795122048), (-37.9745993018, -149.3839472532))
            Line((-37.9745993018, -149.3839472532), (-37.9745993018, -171.8839472532))
            Line((-37.9745993018, -171.8839472532), (-35.4745993018, -171.8839472532))
            Line((-35.4745993018, -171.8839472532), (-9.4999149442, -171.8839472532))
            Line((-9.4999149442, -171.8839472532), (-9.4999149442, -168.4517562389))
            Line((-9.4999149442, -168.4517562389), (-35.4745993018, -168.9512616546))
        make_face()
    extrude(amount=F31_DEPTH)


solid = Compound([f1.part, f7.part, f10.part, f14.part, f16.part, f19.part, f24.part, f27.part, f30.part, f31.part])
